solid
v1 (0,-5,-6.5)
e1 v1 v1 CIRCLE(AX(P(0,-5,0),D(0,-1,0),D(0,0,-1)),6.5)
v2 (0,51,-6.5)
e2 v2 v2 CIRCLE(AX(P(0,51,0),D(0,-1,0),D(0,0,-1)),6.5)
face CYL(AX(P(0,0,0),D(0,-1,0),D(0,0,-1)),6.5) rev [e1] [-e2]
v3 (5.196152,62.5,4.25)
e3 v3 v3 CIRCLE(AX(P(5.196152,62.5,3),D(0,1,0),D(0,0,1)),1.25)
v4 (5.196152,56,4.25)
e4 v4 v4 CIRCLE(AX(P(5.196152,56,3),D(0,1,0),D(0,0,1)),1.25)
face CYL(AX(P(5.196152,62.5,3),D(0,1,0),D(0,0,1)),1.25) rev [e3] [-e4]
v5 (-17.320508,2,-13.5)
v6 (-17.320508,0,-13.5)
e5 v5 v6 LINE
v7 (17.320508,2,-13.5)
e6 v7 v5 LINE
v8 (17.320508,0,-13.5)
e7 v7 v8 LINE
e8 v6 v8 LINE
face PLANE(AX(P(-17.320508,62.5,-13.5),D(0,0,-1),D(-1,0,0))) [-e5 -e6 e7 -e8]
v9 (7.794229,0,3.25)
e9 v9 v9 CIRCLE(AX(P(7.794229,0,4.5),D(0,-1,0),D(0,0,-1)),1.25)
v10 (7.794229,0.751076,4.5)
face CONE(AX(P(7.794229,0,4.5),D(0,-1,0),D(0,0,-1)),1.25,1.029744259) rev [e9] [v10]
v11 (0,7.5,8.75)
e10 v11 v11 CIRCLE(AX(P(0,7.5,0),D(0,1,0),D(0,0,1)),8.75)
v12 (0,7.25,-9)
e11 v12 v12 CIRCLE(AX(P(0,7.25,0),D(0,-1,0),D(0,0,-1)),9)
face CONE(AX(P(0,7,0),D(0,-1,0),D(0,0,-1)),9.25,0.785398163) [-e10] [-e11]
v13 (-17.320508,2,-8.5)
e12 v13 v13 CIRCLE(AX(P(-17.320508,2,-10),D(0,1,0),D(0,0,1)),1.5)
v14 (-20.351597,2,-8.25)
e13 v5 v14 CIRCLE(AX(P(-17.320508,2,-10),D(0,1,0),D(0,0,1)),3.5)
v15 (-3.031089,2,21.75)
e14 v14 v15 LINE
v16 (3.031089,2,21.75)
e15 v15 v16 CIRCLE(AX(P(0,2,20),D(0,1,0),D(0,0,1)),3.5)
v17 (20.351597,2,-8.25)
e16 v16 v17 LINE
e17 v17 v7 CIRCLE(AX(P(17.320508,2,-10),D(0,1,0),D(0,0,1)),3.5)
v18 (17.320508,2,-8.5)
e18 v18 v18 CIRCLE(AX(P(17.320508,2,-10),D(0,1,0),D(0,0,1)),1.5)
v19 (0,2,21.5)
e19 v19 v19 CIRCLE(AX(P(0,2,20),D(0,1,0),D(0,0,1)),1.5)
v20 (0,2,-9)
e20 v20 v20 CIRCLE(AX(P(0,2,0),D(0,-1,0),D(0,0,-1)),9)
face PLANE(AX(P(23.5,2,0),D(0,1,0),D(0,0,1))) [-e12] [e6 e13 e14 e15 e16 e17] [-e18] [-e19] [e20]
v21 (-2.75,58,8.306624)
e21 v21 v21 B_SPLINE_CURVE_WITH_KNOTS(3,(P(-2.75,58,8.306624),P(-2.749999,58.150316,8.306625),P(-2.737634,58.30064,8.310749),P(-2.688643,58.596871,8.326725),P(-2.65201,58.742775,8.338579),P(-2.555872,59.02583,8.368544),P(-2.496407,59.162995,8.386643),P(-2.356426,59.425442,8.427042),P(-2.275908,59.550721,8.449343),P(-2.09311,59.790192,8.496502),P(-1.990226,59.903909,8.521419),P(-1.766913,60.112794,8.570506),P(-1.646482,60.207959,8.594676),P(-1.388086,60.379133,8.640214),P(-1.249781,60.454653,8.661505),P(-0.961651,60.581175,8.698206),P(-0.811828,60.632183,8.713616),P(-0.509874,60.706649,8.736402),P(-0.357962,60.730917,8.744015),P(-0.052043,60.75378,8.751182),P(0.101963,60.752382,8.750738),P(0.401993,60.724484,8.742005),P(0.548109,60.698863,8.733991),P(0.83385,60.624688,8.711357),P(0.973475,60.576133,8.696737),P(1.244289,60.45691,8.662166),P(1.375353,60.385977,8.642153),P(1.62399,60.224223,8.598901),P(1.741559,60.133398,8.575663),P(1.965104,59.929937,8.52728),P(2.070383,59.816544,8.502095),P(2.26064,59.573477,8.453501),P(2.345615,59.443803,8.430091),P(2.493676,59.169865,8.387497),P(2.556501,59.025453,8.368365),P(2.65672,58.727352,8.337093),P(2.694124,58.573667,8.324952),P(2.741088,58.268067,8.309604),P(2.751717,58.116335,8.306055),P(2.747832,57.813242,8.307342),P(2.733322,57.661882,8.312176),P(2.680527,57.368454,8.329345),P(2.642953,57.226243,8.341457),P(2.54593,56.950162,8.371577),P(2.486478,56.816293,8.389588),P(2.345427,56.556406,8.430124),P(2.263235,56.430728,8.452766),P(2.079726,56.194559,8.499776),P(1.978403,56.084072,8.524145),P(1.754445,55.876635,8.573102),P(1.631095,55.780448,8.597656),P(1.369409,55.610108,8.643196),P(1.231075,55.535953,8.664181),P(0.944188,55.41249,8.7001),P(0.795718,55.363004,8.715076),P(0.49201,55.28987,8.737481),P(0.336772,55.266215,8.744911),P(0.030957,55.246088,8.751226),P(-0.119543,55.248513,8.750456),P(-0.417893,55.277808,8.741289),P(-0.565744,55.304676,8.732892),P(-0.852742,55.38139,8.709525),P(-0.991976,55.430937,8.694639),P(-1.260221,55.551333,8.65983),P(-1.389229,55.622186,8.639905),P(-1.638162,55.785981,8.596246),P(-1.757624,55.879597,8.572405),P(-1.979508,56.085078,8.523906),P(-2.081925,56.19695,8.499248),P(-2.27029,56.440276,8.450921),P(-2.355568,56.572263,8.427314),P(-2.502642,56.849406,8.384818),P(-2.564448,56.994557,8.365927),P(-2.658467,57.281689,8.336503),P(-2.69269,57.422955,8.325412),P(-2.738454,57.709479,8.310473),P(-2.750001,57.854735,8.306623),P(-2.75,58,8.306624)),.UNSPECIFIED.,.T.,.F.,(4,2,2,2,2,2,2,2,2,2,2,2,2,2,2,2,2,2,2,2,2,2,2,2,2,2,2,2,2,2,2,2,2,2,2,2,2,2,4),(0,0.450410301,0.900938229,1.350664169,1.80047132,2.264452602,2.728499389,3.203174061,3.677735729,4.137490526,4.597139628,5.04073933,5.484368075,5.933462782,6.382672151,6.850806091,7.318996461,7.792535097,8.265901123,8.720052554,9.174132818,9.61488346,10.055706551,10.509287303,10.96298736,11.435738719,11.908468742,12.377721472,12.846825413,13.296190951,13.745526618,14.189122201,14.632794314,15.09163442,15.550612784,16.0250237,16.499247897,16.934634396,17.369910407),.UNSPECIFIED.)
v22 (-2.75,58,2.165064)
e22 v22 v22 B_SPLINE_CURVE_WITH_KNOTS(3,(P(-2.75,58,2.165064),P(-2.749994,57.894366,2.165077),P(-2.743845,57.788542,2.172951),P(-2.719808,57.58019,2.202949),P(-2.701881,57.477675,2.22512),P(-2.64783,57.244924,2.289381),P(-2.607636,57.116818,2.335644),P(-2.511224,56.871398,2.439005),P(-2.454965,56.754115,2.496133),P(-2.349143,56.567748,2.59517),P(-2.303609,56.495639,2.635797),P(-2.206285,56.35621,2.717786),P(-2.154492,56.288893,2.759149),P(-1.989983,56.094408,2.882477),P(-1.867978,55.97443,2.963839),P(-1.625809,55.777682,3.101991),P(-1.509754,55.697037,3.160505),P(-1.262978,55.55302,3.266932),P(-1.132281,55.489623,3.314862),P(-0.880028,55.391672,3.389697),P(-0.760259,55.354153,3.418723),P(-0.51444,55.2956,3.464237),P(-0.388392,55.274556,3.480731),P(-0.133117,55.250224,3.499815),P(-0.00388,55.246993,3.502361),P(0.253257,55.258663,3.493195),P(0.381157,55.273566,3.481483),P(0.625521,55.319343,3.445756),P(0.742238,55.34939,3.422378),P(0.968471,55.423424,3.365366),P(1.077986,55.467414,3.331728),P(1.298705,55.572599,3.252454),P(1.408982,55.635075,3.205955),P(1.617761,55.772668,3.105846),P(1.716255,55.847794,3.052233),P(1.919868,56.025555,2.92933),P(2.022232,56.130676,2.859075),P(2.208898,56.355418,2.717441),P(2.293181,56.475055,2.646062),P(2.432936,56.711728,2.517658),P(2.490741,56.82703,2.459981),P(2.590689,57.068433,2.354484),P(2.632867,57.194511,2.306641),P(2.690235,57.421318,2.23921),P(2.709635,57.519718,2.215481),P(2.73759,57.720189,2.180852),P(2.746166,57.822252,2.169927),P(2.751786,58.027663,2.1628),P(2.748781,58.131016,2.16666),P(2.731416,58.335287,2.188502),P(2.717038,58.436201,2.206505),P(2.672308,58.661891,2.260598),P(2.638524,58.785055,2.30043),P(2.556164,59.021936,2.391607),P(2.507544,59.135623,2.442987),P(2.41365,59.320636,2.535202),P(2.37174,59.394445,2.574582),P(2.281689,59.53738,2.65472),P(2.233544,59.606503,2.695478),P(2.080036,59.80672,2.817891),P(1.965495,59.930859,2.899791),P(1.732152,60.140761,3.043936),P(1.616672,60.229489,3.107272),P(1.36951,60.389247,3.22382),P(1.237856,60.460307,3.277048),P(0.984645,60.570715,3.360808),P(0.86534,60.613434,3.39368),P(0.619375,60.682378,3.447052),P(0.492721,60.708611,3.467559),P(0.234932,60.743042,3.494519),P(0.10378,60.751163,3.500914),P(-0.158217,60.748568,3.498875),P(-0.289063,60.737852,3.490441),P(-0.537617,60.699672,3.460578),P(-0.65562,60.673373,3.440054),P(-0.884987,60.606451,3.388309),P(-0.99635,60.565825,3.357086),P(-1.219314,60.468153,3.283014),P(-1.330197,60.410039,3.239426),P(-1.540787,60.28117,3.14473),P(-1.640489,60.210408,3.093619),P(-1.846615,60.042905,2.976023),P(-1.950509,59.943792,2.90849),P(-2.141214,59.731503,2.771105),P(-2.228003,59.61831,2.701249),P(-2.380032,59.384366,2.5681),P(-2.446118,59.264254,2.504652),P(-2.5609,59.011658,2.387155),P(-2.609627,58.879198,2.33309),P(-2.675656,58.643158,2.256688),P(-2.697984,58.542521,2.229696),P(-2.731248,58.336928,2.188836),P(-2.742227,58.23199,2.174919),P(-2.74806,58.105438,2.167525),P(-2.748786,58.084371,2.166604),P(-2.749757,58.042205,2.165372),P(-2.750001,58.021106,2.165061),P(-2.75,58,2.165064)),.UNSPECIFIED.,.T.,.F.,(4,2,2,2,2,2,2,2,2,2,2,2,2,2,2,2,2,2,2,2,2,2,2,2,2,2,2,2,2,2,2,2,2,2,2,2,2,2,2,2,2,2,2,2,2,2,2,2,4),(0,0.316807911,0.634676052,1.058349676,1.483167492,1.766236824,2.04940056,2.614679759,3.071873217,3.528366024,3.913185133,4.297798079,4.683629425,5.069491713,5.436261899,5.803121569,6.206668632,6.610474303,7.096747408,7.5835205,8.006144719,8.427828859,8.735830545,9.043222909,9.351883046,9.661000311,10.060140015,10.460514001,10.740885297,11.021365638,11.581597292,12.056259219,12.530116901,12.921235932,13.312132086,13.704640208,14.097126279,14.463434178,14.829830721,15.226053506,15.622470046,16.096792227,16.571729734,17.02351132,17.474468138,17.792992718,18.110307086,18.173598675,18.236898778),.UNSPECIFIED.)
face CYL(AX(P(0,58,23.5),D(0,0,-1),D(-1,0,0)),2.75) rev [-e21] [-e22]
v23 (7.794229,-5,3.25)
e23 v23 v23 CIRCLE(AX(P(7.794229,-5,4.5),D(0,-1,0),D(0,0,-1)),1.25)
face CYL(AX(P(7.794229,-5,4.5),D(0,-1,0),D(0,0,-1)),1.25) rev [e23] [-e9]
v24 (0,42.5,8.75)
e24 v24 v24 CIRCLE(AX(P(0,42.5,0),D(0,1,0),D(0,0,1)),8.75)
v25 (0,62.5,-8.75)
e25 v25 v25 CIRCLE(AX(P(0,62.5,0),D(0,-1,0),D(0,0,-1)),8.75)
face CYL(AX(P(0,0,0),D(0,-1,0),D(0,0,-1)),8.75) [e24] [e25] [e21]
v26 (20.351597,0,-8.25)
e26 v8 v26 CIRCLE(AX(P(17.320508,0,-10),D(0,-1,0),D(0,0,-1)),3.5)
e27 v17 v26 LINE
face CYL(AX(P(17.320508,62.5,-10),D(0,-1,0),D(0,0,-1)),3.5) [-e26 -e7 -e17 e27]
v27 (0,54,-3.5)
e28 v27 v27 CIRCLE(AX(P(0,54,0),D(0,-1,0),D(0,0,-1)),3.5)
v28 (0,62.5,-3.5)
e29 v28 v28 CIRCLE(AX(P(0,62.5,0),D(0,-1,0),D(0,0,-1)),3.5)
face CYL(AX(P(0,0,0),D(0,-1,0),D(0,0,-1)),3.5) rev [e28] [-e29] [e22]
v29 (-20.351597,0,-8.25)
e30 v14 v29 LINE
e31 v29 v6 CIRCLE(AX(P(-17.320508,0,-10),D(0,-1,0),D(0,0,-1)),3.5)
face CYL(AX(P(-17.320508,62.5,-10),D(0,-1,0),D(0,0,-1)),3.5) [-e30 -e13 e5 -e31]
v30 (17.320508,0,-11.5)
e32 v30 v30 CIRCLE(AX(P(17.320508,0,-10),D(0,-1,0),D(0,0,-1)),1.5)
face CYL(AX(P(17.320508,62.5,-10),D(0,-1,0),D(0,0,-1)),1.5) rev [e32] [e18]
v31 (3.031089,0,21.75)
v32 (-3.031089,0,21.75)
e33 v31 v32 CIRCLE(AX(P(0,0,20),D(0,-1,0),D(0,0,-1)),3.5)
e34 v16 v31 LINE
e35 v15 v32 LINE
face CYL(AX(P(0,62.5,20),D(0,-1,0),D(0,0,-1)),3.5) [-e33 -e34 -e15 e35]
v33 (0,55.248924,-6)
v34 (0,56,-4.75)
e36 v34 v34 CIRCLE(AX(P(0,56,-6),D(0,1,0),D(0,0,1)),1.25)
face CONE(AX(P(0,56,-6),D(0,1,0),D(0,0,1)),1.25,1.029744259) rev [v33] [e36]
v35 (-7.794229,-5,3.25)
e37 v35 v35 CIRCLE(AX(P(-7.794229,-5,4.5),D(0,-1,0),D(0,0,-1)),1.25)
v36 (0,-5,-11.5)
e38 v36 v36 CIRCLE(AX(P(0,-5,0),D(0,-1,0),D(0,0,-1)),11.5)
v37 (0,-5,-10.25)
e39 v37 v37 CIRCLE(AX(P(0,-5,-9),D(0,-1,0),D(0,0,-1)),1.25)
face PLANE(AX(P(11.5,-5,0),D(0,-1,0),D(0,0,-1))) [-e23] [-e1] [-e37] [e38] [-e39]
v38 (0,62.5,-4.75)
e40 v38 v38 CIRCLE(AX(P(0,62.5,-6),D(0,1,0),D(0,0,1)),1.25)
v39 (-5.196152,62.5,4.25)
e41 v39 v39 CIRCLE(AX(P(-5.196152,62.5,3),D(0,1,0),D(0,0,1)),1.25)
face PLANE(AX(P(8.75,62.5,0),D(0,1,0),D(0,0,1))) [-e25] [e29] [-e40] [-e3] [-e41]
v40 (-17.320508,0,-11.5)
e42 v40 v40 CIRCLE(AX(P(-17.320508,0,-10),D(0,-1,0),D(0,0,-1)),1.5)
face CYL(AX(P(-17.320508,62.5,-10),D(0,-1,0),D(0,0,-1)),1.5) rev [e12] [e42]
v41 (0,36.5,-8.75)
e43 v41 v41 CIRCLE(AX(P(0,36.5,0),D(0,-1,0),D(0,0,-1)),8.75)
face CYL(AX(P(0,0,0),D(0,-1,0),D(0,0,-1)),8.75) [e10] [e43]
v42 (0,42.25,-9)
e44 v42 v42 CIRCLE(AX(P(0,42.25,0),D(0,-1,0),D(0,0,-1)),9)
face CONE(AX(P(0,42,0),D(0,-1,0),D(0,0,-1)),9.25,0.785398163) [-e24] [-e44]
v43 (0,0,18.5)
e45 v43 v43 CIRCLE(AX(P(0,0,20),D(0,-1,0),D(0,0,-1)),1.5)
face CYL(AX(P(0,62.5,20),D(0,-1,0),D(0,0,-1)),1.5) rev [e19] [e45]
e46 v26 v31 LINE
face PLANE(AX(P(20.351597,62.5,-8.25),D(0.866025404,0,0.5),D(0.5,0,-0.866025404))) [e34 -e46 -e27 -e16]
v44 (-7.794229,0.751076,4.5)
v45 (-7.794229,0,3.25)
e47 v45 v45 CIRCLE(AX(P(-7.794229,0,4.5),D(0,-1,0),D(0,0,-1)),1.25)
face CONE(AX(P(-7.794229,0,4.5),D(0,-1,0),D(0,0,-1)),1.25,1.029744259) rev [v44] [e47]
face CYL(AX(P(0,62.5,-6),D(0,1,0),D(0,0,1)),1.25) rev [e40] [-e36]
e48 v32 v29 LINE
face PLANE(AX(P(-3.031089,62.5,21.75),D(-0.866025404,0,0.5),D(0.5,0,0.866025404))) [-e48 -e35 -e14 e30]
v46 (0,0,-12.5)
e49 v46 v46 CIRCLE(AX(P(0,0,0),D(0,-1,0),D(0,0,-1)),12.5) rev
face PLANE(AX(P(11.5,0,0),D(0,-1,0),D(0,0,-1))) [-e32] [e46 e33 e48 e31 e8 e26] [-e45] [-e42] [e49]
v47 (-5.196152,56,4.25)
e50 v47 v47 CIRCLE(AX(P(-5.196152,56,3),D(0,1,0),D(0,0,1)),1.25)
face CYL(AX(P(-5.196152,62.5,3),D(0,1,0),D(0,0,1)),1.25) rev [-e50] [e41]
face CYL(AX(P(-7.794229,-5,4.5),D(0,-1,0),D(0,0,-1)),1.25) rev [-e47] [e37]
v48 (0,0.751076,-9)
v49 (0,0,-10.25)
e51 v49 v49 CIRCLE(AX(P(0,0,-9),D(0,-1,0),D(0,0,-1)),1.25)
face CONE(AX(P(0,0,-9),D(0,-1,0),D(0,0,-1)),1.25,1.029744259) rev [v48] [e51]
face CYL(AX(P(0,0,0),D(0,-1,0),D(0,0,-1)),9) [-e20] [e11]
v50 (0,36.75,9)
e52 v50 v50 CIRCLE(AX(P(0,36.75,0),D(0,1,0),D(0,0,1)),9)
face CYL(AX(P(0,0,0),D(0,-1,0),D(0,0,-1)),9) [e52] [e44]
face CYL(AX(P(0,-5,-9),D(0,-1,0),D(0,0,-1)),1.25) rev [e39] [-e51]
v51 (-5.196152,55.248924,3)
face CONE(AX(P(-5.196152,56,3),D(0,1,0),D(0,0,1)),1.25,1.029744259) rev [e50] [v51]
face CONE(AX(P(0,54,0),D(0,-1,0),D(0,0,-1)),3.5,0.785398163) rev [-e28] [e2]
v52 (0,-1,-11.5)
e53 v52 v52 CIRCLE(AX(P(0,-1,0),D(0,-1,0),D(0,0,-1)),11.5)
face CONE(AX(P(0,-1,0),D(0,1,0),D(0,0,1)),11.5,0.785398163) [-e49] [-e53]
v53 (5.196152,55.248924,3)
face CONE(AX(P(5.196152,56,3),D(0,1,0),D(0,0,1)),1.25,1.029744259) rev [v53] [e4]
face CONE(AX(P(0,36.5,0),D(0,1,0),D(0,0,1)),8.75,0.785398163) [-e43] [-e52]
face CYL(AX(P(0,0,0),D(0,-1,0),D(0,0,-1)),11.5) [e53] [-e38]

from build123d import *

# Parameters (mm, degrees)
CHAMFER_1_SIZE         = 0.5
CHAMFER_2_SIZE         = 1
SKETCH_9_OUTSIDE_W     = 67.946
SKETCH_9_OUTSIDE_H     = 67.946
SKETCH_9_OUTSIDE_R     = 1.5
CUT_EXTRUDE_2_DEPTH    = 71.786651284
HOLE_WIZARD_M3_1_D     = 2.5
HOLE_WIZARD_M3_1_DEPTH = 5
HOLE_WIZARD_M3_1_TIP   = 0.751075774
HOLE_WIZARD_M3_2_D     = 2.5
HOLE_WIZARD_M3_2_DEPTH = 6.5
HOLE_WIZARD_M3_2_TIP   = 0.751075774
SKETCH_11_R            = 2.75
CUT_EXTRUDE_4_DEPTH    = 70.942787738


with BuildPart() as part:
    # 草图2 → 旋转1 (revolve)
    with BuildSketch(Plane.XY, mode=Mode.PRIVATE) as revolve_1_sk:
        Polygon((9, 2), (9, 7), (8.75, 7), (8.75, 37), (9, 37), (9, 42), (8.75, 42), (8.75, 62.5), (3.5, 62.5), (3.5, 54), (6.5, 51), (6.5, -5), (11.5, -5), (11.5, 0), (23.5, 0), (23.5, 2), align=None)
    revolve(revolve_1_sk.sketch.rotate(Axis((0, 0, 0), (0, 1, 0)), 90), axis=Axis((0, 0, 0), (0, 1, 0)))

    # 倒角1
    # the kernel refuses this chamfer: 0.5 mm, written as the material it adds along each edge
    with BuildSketch(Plane(origin=(0, 42, 0), x_dir=(0, 0, -1), z_dir=(1, 0, 0))) as chamfer_1_piece_1_section:
        Polygon((8.75 + CHAMFER_1_SIZE, 0), (8.75, CHAMFER_1_SIZE), (8.75, 0), align=None)
    chamfer_1_piece_1 = revolve(axis=Axis((0, 42, 0), (0, 1, 0)), mode=Mode.PRIVATE)
    chamfer_1_piece_1 = chamfer_1_piece_1 & Plane(origin=(0, 42.369448451, 0), x_dir=(0, 0, -1), z_dir=(0, 1, 0)) * Cylinder(9, 38, mode=Mode.PRIVATE)
    add(chamfer_1_piece_1)
    with BuildSketch(Plane(origin=(0, 37, 0), x_dir=(0, 0, -1), z_dir=(1, 0, 0))) as chamfer_1_piece_2_section:
        Polygon((8.75, -CHAMFER_1_SIZE), (8.75 + CHAMFER_1_SIZE, 0), (8.75, 0), align=None)
    chamfer_1_piece_2 = revolve(axis=Axis((0, 37, 0), (0, 1, 0)), mode=Mode.PRIVATE)
    chamfer_1_piece_2 = chamfer_1_piece_2 & Plane(origin=(0, 36.630551549, 0), x_dir=(0, 0, -1), z_dir=(0, 1, 0)) * Cylinder(9, 38, mode=Mode.PRIVATE)
    add(chamfer_1_piece_2)
    with BuildSketch(Plane(origin=(0, 7, 0), x_dir=(0, 0, -1), z_dir=(1, 0, 0))) as chamfer_1_piece_3_section:
        Polygon((8.75 + CHAMFER_1_SIZE, 0), (8.75, CHAMFER_1_SIZE), (8.75, 0), align=None)
    chamfer_1_piece_3 = revolve(axis=Axis((0, 7, 0), (0, 1, 0)), mode=Mode.PRIVATE)
    chamfer_1_piece_3 = chamfer_1_piece_3 & Plane(origin=(0, 7.369448451, 0), x_dir=(0, 0, -1), z_dir=(0, 1, 0)) * Cylinder(9, 38, mode=Mode.PRIVATE)
    add(chamfer_1_piece_3)

    # 倒角2
    chamfer_2_edges = [part.edges().sort_by_distance(p)[0] for p in [
        (0, 0, 11.5),
    ]]
    chamfer(chamfer_2_edges, length=CHAMFER_2_SIZE)

    # 草图9 outside → 切除-拉伸2 (cut, through all)
    # profile 1 of 4: a face of its own
    with BuildSketch(Plane.XZ):
        Rectangle(SKETCH_9_OUTSIDE_W, SKETCH_9_OUTSIDE_H)
        with BuildLine():
            Line((-3.031088913, 21.75), (-20.351596989, -8.25))
            ThreePointArc((-20.351596989, -8.25), (-20.351596989, -11.75), (-17.320508076, -13.5))
            Line((-17.320508076, -13.5), (17.320508076, -13.5))
            ThreePointArc((17.320508076, -13.5), (20.351596989, -11.75), (20.351596989, -8.25))
            Line((20.351596989, -8.25), (3.031088913, 21.75))
            ThreePointArc((3.031088913, 21.75), (0, 23.5), (-3.031088913, 21.75))
        make_face(mode=Mode.SUBTRACT)
    # profile 2 of 4: a face of its own
    with BuildSketch(Plane.XZ):
        with Locations(Location((0, 20, 0), (0, 0, 270))):
            Circle(SKETCH_9_OUTSIDE_R)
    # profile 3 of 4: a face of its own
    with BuildSketch(Plane.XZ):
        with Locations(Location((17.320508076, -10, 0), (0, 0, 270))):
            Circle(SKETCH_9_OUTSIDE_R)
    # profile 4 of 4: a face of its own
    with BuildSketch(Plane.XZ):
        with Locations(Location((-17.320508076, -10, 0), (0, 0, 270))):
            Circle(SKETCH_9_OUTSIDE_R)
    extrude(amount=-CUT_EXTRUDE_2_DEPTH, mode=Mode.SUBTRACT)

    # M3 螺纹孔1
    with Locations(Plane.XZ.offset(5)):
        with Locations((0, -9), (7.794228634, 4.5), (-7.794228634, 4.5)):
            Hole(HOLE_WIZARD_M3_1_D / 2, depth=HOLE_WIZARD_M3_1_DEPTH)
            with Locations((0, 0, -(HOLE_WIZARD_M3_1_DEPTH + HOLE_WIZARD_M3_1_TIP / 2))):  # 118° drill point
                Cone(0, HOLE_WIZARD_M3_1_D / 2, HOLE_WIZARD_M3_1_TIP, mode=Mode.SUBTRACT)

    # M3 螺纹孔2
    with Locations(Plane(origin=(0, 62.5, 0), x_dir=(1, 0, 0), z_dir=(0, 1, 0))):
        with Locations((0, 6), (5.196152423, -3), (-5.196152423, -3)):
            Hole(HOLE_WIZARD_M3_2_D / 2, depth=HOLE_WIZARD_M3_2_DEPTH)
            with Locations((0, 0, -(HOLE_WIZARD_M3_2_DEPTH + HOLE_WIZARD_M3_2_TIP / 2))):  # 118° drill point
                Cone(0, HOLE_WIZARD_M3_2_D / 2, HOLE_WIZARD_M3_2_TIP, mode=Mode.SUBTRACT)

    # 草图11 → 切除-拉伸4 (cut, through all)
    with BuildSketch(Plane.XY):
        with Locations(Location((0, 58, 0), (0, 0, 180))):
            Circle(SKETCH_11_R)
    extrude(amount=CUT_EXTRUDE_4_DEPTH, mode=Mode.SUBTRACT)


solid = part.part
